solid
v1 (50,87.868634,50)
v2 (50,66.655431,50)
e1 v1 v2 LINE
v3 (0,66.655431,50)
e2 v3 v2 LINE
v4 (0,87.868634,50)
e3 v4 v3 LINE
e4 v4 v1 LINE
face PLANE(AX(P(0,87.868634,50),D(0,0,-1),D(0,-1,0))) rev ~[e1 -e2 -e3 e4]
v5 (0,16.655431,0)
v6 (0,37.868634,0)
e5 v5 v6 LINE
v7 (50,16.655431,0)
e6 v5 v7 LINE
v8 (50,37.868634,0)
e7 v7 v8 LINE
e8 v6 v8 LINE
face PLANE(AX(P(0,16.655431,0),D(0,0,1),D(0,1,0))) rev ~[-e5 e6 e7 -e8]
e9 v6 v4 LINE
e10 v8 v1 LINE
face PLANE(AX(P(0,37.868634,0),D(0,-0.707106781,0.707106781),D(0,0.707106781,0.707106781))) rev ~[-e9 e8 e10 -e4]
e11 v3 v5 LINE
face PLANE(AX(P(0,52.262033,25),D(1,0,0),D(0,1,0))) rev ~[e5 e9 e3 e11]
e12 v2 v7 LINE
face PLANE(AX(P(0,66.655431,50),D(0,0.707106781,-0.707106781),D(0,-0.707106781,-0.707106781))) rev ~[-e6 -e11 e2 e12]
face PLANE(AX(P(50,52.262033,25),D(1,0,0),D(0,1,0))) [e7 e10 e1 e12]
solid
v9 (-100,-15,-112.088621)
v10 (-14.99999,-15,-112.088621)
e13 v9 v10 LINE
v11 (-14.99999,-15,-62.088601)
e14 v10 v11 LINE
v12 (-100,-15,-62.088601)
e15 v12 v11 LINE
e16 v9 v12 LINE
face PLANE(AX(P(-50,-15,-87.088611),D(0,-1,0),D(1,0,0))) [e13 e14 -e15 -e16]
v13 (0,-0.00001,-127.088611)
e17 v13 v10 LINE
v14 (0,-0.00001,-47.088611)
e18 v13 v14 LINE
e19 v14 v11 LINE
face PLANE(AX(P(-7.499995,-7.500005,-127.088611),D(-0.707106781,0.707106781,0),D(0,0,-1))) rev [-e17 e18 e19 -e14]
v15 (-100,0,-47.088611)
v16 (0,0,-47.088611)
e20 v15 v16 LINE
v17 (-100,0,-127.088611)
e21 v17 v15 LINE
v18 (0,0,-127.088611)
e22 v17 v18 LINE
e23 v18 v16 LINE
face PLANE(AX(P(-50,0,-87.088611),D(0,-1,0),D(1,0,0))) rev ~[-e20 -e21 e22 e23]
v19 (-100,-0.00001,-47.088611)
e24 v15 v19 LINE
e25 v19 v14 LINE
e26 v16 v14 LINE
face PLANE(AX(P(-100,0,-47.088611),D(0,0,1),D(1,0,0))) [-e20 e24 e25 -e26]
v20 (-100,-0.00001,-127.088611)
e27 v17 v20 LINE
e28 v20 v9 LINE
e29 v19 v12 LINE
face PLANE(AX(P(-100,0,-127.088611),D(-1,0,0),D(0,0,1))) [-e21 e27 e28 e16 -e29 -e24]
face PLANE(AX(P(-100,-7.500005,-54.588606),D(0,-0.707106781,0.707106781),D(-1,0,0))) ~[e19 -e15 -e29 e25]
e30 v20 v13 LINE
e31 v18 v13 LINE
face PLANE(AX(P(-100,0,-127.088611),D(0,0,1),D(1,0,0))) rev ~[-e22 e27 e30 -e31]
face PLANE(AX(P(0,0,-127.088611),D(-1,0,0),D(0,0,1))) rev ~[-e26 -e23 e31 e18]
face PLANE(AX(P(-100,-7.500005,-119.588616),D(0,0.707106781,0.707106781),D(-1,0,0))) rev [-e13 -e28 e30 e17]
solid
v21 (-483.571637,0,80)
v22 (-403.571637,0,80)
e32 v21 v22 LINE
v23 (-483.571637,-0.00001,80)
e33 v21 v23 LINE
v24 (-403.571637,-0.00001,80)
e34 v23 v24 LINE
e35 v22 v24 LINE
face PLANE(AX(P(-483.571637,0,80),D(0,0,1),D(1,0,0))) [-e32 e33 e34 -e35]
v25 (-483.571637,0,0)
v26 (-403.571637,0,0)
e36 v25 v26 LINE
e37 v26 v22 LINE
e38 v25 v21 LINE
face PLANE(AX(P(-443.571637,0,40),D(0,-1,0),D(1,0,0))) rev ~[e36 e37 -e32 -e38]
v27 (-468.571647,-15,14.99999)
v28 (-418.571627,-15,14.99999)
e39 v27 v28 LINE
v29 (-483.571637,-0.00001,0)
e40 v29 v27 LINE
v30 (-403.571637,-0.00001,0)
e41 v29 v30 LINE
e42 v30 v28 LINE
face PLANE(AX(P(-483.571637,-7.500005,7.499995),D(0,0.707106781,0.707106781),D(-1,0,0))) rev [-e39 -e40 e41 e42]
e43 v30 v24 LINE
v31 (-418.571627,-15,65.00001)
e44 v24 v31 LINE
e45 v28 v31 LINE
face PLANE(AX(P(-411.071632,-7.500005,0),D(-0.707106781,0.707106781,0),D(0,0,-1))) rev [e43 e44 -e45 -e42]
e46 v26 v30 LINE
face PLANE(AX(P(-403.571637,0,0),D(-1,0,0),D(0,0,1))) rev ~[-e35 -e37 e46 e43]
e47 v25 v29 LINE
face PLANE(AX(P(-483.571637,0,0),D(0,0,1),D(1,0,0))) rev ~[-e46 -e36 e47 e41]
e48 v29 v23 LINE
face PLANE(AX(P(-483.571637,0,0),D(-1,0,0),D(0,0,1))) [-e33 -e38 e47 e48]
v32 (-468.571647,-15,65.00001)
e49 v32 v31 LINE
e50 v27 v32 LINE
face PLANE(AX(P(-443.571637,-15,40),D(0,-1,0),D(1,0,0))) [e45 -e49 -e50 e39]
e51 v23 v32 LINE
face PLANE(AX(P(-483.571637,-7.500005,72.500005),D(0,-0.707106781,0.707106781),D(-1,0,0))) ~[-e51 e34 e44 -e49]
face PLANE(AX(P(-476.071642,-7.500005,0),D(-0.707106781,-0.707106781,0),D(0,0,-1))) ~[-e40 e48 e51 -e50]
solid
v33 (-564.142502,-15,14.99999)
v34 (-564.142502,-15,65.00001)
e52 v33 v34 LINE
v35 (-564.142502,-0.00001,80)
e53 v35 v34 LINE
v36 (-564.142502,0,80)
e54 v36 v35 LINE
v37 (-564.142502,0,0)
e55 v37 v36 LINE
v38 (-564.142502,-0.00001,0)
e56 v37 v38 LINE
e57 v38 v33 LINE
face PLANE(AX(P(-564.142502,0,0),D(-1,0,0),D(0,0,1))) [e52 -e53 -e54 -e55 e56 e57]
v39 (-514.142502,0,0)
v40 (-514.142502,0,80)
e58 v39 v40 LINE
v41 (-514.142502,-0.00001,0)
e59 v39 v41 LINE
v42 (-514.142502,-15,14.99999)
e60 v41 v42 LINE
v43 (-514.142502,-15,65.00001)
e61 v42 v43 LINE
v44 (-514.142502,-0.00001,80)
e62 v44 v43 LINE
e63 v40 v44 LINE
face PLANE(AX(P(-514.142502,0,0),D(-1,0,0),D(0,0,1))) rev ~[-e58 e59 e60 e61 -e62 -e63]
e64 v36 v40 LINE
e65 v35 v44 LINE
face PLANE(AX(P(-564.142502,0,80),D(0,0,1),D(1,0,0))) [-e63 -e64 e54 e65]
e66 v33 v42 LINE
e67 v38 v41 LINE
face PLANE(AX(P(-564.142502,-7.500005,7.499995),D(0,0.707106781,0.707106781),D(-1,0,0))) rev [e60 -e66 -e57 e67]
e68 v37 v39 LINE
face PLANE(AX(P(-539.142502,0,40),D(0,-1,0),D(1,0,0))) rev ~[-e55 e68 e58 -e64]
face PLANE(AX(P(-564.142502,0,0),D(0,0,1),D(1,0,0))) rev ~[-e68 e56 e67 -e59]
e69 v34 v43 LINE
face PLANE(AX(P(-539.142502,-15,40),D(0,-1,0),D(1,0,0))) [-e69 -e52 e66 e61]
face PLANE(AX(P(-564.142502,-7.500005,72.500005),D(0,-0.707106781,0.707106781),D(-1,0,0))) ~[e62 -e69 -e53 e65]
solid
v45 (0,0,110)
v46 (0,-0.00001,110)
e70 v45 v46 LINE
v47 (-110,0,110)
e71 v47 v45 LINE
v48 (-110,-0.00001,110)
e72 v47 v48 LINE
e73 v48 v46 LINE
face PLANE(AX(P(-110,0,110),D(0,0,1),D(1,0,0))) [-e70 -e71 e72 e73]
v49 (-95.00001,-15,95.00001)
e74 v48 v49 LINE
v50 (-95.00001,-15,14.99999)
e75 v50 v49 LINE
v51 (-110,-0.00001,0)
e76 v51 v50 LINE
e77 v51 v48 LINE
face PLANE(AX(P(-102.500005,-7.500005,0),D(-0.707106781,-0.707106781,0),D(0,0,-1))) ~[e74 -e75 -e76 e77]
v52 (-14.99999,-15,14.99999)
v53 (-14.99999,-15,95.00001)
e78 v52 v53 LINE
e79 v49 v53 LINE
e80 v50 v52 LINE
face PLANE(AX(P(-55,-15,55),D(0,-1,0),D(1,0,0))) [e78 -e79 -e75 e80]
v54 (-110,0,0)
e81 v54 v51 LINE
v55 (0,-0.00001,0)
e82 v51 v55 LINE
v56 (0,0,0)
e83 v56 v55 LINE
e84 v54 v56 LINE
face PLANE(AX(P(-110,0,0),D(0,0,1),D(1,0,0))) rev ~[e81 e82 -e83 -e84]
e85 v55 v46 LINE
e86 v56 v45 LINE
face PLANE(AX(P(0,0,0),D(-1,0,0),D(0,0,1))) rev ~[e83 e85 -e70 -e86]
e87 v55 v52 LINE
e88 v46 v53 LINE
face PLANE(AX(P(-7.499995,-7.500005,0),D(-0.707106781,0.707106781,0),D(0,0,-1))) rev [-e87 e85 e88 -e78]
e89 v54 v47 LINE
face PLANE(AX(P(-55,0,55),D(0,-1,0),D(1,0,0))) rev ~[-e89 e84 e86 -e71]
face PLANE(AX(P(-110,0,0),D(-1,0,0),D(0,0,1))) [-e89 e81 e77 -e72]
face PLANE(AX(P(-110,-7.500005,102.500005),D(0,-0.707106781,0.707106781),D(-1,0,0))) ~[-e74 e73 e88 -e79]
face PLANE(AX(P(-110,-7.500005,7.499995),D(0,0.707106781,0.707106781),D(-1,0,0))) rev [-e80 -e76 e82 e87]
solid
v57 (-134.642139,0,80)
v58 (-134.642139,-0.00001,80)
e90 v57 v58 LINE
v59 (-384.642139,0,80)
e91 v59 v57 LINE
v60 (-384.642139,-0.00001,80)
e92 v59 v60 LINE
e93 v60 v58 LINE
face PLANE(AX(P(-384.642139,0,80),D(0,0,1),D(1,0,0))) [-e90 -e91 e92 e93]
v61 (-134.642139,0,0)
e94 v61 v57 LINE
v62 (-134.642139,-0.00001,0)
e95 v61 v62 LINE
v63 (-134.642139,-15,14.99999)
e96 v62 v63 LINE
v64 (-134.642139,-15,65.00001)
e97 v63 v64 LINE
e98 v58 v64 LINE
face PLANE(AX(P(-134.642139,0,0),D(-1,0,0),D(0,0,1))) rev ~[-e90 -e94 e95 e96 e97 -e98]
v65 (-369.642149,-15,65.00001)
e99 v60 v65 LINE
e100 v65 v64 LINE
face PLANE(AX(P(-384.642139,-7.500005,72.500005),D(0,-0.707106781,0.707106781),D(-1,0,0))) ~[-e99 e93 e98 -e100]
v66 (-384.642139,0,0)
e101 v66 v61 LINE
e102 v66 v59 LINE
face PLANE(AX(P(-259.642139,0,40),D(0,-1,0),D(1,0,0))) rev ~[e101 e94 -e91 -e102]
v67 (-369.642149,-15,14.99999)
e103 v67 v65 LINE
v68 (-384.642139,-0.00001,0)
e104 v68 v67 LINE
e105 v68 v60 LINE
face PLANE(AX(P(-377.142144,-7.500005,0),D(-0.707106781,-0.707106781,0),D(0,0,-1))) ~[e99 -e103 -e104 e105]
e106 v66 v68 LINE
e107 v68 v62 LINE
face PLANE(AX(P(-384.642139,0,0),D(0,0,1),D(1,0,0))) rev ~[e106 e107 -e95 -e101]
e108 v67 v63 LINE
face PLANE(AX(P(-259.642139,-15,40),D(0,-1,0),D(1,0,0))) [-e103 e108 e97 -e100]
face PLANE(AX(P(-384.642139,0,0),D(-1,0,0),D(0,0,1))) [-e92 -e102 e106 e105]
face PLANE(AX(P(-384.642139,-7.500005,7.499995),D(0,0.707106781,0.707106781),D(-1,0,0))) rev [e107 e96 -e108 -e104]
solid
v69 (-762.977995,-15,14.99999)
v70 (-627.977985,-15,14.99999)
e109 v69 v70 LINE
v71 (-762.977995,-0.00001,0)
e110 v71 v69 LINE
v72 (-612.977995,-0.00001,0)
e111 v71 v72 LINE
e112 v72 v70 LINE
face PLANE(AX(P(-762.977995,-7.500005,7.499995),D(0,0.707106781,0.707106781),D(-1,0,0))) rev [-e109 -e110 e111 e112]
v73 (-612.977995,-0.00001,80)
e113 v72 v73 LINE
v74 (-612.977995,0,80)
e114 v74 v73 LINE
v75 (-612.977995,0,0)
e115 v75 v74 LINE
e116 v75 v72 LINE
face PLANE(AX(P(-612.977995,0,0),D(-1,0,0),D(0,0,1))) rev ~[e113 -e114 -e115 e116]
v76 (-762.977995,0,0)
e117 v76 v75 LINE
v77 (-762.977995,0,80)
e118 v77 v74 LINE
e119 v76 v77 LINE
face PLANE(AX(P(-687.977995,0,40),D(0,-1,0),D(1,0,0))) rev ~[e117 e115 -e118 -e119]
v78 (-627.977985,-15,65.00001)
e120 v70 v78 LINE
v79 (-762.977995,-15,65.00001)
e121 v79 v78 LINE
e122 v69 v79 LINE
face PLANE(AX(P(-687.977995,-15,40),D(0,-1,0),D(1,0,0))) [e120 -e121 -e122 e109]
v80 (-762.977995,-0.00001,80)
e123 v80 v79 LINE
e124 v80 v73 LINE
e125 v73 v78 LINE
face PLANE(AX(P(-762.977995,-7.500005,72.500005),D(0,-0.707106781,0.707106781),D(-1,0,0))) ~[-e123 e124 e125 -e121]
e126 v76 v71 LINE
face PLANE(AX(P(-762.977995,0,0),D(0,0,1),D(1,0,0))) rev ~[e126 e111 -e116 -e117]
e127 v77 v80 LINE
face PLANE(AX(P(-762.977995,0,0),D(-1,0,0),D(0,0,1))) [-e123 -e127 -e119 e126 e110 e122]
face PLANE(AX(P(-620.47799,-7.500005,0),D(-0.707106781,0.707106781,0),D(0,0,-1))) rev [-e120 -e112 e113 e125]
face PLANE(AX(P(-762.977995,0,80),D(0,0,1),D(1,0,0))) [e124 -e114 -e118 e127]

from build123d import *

# Parameters (mm, degrees)
F0_W       = 110
F0_H       = 110
F1_DEPTH   = 15
F2_W       = 250
F2_H       = 80
F3_DEPTH   = 15
F4_W       = 80
F4_H       = 80
F5_DEPTH   = 15
F6_W       = 50
F6_H       = 80
F7_DEPTH   = 15
F8_W       = 150
F8_H       = 80
F9_DEPTH   = 15
F11_DEPTH  = 50
F12_W      = 100
F12_H      = 80
F13_DEPTH  = 15
F14_SIZE   = 14.99999
F14_2_SIZE = 14.99999
F14_3_SIZE = 14.99999
F14_4_SIZE = 14.99999
F14_5_SIZE = 14.99999
F14_6_SIZE = 14.99999


# Not quite as in the source:
# - a fillet or chamfer is up to 0.001 mm smaller than in the source, because OpenCascade refuses the exact size


with BuildPart() as f1:
    # F0 (on Front) → F1 (new body)
    with BuildSketch(Plane.XZ):
        with Locations((-55, 55)):
            Rectangle(F0_W, F0_H)
    extrude(amount=F1_DEPTH)

    # F14#2 (size 15 in the source; OpenCascade refuses exactly that, so slightly less here)
    f14_2_edges = [f1.edges().sort_by_distance(p)[0] for p in [
        (-55, -15, 0),
        (0, -15, 55),
        (-55, -15, 110),
        (-110, -15, 55),
    ]]
    chamfer(f14_2_edges, length=F14_2_SIZE)


with BuildPart() as f3:
    # F2 (on Front) → F3 (new body)
    with BuildSketch(Plane.XZ):
        with Locations((-259.6421393369, 40)):
            Rectangle(F2_W, F2_H)
    extrude(amount=F3_DEPTH)

    # F14#3 (size 15 in the source; OpenCascade refuses exactly that, so slightly less here)
    f14_3_edges = [f3.edges().sort_by_distance(p)[0] for p in [
        (-259.642139, -15, 80),
        (-384.642139, -15, 40),
        (-259.642139, -15, 0),
    ]]
    chamfer(f14_3_edges, length=F14_3_SIZE)


with BuildPart() as f5:
    # F4 (on Front) → F5 (new body)
    with BuildSketch(Plane.XZ):
        with Locations((-443.5716368201, 40)):
            Rectangle(F4_W, F4_H)
    extrude(amount=F5_DEPTH)

    # F14 (size 15 in the source; OpenCascade refuses exactly that, so slightly less here)
    f14_edges = [f5.edges().sort_by_distance(p)[0] for p in [
        (-443.571637, -15, 0),
        (-403.571637, -15, 40),
        (-443.571637, -15, 80),
        (-483.571637, -15, 40),
    ]]
    chamfer(f14_edges, length=F14_SIZE)


with BuildPart() as f7:
    # F6 (on Front) → F7 (new body)
    with BuildSketch(Plane.XZ):
        with Locations((-539.1425021022, 40)):
            Rectangle(F6_W, F6_H)
    extrude(amount=F7_DEPTH)

    # F14#4 (size 15 in the source; OpenCascade refuses exactly that, so slightly less here)
    f14_4_edges = [f7.edges().sort_by_distance(p)[0] for p in [
        (-539.142502, -15, 80),
        (-539.142502, -15, 0),
    ]]
    chamfer(f14_4_edges, length=F14_4_SIZE)


with BuildPart() as f9:
    # F8 (on Front) → F9 (new body)
    with BuildSketch(Plane.XZ):
        with Locations((-687.9779948193, 40)):
            Rectangle(F8_W, F8_H)
    extrude(amount=F9_DEPTH)

    # F14#5 (size 15 in the source; OpenCascade refuses exactly that, so slightly less here)
    f14_5_edges = [f9.edges().sort_by_distance(p)[0] for p in [
        (-687.977995, -15, 0),
        (-687.977995, -15, 80),
        (-612.977995, -15, 40),
    ]]
    chamfer(f14_5_edges, length=F14_5_SIZE)


with BuildPart() as f11:
    # F10 (on Right) → F11 (new body)
    with BuildSketch(Plane.YZ):
        Polygon((66.6554310362, 50), (16.6554310362, 0), (37.8686344718, 0), (87.8686344718, 50), align=None)
    extrude(amount=F11_DEPTH)


with BuildPart() as f13:
    # F12 (on Front) → F13 (new body)
    with BuildSketch(Plane.XZ):
        with Locations((-50, -87.0886105629)):
            Rectangle(F12_W, F12_H)
    extrude(amount=F13_DEPTH)

    # F14#6 (size 15 in the source; OpenCascade refuses exactly that, so slightly less here)
    f14_6_edges = [f13.edges().sort_by_distance(p)[0] for p in [
        (0, -15, -87.088611),
        (-50, -15, -47.088611),
        (-50, -15, -127.088611),
    ]]
    chamfer(f14_6_edges, length=F14_6_SIZE)


solid = Compound([f1.part, f3.part, f5.part, f7.part, f9.part, f11.part, f13.part])
